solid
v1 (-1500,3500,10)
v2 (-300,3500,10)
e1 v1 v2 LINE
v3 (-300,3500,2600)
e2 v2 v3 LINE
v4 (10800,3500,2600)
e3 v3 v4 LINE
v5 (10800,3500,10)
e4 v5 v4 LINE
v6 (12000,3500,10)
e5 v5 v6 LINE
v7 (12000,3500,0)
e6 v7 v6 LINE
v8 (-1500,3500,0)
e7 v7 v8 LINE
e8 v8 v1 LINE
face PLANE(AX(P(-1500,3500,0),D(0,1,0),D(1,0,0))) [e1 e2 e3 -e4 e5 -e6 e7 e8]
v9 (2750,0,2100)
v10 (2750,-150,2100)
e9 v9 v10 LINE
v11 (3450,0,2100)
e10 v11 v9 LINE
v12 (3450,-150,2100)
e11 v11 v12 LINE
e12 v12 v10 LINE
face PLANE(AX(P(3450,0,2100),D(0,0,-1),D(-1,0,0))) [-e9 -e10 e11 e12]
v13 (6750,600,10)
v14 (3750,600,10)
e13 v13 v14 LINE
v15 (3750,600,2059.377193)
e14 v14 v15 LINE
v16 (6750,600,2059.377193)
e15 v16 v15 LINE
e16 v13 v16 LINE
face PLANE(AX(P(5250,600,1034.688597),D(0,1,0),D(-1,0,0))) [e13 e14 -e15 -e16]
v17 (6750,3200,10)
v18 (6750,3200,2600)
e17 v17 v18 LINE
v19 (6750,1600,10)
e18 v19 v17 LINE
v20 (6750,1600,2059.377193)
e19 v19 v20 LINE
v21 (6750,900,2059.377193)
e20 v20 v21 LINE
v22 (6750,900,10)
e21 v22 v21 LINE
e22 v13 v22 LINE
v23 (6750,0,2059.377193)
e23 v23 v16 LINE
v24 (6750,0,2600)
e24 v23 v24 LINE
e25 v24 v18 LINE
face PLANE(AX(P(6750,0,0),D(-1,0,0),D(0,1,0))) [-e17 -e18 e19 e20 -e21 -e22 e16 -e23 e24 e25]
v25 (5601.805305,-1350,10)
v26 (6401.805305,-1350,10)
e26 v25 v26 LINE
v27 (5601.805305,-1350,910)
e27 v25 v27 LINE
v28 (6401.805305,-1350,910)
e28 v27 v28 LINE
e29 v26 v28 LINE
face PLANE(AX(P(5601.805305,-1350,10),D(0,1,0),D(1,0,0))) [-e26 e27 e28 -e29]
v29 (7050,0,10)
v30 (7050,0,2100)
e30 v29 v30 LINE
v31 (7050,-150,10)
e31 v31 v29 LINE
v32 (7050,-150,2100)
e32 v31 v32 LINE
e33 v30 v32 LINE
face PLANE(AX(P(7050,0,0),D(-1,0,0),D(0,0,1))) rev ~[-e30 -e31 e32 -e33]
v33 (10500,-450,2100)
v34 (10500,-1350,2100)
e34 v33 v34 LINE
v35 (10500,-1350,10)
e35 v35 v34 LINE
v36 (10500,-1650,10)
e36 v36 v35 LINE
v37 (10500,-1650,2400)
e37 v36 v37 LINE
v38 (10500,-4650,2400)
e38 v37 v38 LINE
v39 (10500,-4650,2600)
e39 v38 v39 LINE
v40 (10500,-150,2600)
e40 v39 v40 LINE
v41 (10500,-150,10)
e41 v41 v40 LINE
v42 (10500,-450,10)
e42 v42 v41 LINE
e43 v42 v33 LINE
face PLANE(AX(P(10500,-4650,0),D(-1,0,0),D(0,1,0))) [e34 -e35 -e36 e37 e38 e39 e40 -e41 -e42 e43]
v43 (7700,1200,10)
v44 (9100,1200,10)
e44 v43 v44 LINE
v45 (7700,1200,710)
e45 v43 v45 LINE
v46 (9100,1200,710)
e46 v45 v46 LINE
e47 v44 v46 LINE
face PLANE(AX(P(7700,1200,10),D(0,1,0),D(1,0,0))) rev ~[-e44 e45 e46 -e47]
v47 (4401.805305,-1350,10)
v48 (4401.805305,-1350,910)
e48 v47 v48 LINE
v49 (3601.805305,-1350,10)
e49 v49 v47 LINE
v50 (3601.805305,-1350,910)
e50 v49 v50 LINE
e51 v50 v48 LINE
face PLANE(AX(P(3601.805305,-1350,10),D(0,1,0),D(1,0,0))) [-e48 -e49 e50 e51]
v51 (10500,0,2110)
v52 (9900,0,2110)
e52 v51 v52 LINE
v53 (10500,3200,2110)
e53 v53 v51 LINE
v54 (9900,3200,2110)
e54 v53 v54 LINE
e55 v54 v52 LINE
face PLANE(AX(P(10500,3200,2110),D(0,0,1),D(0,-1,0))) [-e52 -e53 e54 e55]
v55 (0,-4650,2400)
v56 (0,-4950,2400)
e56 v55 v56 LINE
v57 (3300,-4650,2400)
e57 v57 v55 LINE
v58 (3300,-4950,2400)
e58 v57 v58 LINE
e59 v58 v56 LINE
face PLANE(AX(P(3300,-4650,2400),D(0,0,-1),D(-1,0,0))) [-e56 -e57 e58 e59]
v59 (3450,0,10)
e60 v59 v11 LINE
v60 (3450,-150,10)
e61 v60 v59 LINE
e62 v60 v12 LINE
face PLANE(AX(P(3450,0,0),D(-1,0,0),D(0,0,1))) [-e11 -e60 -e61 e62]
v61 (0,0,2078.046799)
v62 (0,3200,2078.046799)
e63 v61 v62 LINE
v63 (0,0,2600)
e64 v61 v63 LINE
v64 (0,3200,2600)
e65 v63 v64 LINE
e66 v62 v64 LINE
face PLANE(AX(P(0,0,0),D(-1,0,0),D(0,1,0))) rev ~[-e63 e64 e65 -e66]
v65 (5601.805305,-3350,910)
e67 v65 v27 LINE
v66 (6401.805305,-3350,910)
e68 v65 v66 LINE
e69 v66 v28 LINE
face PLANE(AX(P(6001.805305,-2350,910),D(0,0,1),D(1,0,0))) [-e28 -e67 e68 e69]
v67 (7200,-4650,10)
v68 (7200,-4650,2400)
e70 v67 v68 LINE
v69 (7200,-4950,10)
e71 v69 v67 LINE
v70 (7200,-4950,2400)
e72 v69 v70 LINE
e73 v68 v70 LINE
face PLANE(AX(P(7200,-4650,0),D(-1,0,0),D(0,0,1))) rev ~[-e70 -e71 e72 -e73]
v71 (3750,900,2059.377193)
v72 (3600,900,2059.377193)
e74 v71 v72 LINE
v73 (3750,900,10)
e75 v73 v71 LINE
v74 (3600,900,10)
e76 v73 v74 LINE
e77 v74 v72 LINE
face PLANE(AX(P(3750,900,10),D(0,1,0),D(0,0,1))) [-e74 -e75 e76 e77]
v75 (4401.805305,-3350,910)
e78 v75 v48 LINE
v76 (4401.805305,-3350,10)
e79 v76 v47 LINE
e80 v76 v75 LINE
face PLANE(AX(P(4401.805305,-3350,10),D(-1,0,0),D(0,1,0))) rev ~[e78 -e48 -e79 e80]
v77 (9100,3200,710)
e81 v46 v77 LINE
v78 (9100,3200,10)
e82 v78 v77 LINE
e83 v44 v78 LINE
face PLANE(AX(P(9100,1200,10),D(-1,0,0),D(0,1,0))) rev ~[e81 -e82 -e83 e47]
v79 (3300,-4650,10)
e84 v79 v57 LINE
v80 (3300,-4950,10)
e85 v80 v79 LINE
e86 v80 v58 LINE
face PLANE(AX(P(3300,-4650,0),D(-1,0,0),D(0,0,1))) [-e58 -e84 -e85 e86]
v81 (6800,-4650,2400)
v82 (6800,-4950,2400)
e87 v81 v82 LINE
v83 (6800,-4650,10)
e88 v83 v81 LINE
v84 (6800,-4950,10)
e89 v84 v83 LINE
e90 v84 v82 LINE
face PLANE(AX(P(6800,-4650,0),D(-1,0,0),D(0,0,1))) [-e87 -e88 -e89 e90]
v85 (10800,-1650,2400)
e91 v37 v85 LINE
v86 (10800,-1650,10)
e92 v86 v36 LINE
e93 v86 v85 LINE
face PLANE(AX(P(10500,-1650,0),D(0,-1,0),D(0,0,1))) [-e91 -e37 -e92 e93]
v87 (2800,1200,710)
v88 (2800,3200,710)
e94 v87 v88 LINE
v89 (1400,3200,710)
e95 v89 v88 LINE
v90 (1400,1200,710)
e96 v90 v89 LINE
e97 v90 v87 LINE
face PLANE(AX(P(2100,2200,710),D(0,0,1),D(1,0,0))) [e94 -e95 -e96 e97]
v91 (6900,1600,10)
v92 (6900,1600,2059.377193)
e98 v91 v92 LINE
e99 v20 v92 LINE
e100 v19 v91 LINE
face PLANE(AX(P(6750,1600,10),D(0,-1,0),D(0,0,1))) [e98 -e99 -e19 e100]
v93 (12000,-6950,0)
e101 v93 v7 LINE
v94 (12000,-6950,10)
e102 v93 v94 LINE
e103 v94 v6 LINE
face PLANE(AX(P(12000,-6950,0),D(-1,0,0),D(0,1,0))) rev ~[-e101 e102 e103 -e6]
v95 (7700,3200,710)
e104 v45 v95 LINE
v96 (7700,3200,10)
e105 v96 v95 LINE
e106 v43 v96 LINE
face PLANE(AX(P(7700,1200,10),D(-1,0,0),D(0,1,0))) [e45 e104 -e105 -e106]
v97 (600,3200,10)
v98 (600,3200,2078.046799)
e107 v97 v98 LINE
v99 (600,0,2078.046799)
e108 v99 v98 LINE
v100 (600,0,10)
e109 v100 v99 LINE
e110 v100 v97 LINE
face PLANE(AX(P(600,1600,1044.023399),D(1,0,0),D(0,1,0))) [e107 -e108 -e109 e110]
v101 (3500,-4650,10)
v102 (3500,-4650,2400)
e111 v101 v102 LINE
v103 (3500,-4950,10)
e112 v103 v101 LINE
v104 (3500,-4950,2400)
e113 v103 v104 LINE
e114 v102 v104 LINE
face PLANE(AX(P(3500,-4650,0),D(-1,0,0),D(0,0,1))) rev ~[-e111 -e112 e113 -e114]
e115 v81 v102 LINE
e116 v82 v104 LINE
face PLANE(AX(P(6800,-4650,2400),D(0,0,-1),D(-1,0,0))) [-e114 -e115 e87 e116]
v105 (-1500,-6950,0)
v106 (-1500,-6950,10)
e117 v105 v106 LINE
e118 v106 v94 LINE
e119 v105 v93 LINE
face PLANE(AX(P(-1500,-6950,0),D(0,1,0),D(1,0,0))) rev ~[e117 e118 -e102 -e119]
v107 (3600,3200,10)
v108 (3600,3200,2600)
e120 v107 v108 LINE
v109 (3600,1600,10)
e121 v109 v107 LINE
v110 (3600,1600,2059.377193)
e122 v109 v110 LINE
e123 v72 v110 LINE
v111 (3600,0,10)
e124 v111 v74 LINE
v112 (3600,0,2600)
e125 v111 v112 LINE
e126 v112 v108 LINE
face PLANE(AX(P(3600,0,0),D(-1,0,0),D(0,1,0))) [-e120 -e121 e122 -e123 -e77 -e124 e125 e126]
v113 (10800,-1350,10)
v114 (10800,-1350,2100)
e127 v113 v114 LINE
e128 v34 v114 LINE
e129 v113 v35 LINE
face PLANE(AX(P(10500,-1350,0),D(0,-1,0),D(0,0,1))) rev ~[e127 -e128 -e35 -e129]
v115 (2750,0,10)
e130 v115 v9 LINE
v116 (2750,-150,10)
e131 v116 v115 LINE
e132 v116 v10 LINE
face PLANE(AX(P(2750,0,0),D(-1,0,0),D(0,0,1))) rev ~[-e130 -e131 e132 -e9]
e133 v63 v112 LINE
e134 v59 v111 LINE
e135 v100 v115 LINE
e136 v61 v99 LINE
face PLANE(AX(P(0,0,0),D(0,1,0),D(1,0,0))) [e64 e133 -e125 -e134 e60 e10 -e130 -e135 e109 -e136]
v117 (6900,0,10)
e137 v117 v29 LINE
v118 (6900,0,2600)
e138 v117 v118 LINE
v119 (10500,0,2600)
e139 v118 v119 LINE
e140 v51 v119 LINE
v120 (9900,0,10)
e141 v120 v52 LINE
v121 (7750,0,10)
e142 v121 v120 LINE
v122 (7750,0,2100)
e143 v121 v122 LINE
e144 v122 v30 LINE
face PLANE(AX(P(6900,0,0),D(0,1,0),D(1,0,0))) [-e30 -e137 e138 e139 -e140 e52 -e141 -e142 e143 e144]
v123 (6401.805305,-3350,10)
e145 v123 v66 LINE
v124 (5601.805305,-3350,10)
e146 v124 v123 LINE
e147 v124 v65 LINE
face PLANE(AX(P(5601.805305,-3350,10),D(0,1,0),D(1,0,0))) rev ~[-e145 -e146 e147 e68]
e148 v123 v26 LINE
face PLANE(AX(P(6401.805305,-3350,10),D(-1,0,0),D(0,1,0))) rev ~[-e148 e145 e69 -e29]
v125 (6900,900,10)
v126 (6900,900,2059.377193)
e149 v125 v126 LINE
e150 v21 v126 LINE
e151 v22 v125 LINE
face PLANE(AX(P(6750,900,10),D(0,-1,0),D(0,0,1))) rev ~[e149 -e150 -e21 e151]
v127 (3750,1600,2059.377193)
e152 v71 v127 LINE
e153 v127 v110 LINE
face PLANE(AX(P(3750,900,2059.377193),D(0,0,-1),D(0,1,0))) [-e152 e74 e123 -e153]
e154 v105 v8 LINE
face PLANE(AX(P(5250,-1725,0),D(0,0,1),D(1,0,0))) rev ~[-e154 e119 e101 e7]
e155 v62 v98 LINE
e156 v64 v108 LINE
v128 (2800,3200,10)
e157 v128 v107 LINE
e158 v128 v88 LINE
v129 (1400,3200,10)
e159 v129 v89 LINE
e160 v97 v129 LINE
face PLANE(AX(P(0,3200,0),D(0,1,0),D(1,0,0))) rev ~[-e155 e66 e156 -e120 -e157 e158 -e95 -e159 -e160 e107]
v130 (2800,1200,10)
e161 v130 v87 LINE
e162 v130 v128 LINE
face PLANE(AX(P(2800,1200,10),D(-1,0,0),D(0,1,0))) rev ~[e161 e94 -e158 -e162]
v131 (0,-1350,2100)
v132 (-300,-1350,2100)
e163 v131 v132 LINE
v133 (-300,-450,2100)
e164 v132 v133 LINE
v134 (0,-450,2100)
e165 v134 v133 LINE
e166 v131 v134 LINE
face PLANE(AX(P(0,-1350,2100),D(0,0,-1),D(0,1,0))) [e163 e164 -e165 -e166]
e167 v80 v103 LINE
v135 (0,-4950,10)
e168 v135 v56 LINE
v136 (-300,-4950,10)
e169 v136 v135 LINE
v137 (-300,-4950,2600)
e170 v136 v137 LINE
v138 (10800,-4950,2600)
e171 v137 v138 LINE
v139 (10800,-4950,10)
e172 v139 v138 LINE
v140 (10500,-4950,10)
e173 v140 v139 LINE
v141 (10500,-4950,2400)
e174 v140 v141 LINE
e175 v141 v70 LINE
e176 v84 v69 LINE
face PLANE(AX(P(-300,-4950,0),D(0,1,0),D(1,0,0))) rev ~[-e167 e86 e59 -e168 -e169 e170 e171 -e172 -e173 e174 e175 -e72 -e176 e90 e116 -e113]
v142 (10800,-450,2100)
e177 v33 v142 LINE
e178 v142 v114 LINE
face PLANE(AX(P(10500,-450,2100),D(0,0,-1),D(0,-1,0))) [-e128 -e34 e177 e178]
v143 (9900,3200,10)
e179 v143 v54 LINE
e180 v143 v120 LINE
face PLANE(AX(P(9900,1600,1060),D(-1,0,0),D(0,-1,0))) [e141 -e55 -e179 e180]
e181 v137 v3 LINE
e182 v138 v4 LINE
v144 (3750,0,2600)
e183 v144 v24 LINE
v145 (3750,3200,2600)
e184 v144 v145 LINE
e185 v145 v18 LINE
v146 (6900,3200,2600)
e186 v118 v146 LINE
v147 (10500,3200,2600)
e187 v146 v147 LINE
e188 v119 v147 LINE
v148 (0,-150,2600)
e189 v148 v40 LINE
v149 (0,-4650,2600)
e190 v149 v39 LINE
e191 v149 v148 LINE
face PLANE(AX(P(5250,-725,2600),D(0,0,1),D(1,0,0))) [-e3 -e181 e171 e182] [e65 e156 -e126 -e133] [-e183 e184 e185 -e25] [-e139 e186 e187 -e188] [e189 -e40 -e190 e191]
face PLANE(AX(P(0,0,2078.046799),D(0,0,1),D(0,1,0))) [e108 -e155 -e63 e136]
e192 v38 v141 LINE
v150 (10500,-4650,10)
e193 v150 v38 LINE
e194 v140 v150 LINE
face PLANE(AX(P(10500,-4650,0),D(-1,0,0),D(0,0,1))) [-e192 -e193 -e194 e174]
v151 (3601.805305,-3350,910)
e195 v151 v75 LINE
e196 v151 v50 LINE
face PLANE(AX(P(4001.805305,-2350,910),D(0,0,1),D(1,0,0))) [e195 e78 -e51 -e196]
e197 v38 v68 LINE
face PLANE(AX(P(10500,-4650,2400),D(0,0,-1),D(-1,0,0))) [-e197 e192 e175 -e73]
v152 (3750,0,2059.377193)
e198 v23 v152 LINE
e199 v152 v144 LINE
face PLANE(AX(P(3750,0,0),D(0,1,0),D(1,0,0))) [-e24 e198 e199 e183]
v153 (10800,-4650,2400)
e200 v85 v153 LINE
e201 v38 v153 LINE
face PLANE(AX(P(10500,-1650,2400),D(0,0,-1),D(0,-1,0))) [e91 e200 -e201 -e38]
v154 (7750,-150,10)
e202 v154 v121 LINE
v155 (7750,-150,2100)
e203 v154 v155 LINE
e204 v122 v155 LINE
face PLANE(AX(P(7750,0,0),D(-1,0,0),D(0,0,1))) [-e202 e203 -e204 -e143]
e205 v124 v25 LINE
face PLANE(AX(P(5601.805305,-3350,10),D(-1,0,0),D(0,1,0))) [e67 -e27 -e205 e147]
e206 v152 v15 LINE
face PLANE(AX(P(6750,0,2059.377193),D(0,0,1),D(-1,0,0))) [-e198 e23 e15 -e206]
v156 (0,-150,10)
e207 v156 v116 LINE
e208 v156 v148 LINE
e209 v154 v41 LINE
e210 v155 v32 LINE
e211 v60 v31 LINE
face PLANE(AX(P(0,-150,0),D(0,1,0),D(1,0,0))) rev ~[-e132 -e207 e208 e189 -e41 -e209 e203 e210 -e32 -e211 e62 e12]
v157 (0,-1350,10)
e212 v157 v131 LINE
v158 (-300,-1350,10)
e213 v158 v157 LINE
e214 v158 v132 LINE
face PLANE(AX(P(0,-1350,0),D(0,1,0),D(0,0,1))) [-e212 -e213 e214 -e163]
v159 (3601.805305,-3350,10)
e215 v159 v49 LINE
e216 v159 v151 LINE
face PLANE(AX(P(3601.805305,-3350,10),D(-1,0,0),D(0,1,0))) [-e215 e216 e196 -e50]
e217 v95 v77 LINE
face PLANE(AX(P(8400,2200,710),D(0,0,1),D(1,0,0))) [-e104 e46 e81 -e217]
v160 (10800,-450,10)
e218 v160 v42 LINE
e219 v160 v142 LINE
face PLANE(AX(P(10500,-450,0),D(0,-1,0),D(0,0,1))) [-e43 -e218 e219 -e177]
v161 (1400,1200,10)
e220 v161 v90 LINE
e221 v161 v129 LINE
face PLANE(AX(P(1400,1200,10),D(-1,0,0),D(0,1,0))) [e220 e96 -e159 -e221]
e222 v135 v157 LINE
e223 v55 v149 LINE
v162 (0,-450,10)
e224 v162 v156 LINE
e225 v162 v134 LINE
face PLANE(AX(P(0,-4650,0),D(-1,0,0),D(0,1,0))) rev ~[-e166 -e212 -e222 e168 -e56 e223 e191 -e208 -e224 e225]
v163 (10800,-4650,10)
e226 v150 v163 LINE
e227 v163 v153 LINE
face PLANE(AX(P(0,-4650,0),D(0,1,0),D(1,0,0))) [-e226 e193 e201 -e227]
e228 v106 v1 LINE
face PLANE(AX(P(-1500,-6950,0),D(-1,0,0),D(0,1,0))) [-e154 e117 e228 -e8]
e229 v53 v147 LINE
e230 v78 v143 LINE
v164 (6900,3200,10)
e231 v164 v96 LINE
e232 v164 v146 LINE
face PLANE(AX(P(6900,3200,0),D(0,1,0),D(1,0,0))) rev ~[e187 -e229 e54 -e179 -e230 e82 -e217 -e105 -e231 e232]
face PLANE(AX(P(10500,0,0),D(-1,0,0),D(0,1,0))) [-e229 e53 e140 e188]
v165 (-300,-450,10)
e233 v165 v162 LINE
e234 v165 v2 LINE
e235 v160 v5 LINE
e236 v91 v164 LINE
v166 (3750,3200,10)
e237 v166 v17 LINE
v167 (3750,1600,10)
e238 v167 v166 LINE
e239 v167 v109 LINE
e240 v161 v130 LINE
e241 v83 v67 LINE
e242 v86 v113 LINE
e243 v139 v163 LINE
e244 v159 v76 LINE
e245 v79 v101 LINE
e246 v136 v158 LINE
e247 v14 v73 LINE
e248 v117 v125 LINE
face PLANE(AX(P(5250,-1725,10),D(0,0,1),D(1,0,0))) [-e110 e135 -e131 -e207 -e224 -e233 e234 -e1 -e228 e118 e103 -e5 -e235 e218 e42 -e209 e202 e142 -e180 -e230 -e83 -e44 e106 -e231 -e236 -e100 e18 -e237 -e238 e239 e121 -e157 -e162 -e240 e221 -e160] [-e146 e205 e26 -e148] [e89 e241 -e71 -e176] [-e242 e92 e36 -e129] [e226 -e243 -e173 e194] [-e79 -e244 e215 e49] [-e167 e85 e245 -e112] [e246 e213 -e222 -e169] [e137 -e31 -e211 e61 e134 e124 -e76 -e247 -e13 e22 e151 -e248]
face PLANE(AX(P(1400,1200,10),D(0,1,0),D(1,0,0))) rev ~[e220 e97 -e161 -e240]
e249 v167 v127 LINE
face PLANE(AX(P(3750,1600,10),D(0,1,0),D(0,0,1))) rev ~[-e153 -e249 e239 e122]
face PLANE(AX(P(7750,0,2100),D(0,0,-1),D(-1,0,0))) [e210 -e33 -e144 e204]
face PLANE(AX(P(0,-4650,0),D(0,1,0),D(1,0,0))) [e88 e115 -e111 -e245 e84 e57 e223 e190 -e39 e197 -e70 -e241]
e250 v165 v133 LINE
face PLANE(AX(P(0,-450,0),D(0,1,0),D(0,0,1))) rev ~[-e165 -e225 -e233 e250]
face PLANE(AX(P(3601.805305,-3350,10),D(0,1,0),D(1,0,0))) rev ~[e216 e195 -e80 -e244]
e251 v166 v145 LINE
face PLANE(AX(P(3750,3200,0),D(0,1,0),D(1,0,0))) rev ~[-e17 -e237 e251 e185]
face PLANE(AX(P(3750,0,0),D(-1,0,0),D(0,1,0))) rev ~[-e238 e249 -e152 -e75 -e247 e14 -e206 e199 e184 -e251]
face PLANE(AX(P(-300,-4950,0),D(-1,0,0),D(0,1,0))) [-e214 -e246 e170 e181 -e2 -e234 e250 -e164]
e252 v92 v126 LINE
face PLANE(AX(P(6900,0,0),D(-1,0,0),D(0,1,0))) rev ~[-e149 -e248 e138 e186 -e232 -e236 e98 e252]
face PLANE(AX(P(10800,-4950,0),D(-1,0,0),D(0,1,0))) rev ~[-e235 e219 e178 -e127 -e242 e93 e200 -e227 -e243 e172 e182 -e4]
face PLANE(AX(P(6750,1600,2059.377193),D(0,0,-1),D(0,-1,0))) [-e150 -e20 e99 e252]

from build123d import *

# Parameters (mm, degrees)
F0_W      = 11100
F0_H      = 8450
F0_W_2    = 10500
F0_H_2    = 4500
F0_W_3    = 3600
F0_H_3    = 3200
F0_W_4    = 3000
F1_DEPTH  = 2600
F2_W      = 700
F2_H      = 2100
F3_DEPTH  = 150
F4_W      = 900
F4_H      = 2100
F5_DEPTH  = 300
F6_W      = 900
F6_H      = 2100
F7_DEPTH  = 300
F8_W      = 3000
F8_H      = 2400
F10_DEPTH = 300
F11_W     = 3300
F11_H     = 2400
F12_DEPTH = 300
F13_W     = 13500
F13_H     = 10450
F14_DEPTH = 10
F15_W     = 3200
F15_H     = 2068.0467987061
F16_DEPTH = 600
F17_W     = 3200
F17_H     = 2100
F18_DEPTH = 600
F19_W     = 3000
F19_H     = 2049.3771934509
F20_DEPTH = 600
F21_W     = 1400
F21_H     = 2000
F22_DEPTH = 700
F23_W     = 1400
F23_H     = 2000
F24_DEPTH = 700
F25_W     = 700
F25_H     = 2049.3771934509
F26_DEPTH = 150
F27_W     = 700
F27_H     = 2049.3771934509
F28_DEPTH = 150
F29_W     = 800
F29_H     = 2000
F30_DEPTH = 900


# Not quite as in the source:
# - a feature names something its author has since deleted; it is built from what else it names


with BuildPart() as f1:
    # F0 (on Top) → F1 (new body)
    with BuildSketch(Plane.XY):
        with Locations((5250, -725)):
            Rectangle(F0_W, F0_H)
        with Locations((5250, -2400)):
            Rectangle(F0_W_2, F0_H_2, mode=Mode.SUBTRACT)
        with Locations((1800, 1600)):
            Rectangle(F0_W_3, F0_H_3, mode=Mode.SUBTRACT)
        with Locations((5250, 1600)):
            Rectangle(F0_W_4, F0_H_3, mode=Mode.SUBTRACT)
        with Locations((8700, 1600)):
            Rectangle(F0_W_3, F0_H_3, mode=Mode.SUBTRACT)
    extrude(amount=F1_DEPTH)

    # F2 (on face) → F3 (cut, through all)
    with BuildSketch(Plane(origin=(0, 0, 0), x_dir=(-1, 0, 0), z_dir=(0, 1, 0))):
        with Locations((-7400, 1050)):
            Rectangle(F2_W, F2_H)
        with Locations((-3100, 1050)):
            Rectangle(F2_W, F2_H)
    extrude(amount=-F3_DEPTH, mode=Mode.SUBTRACT)

    # F4 (on face) → F5 (cut, through all)
    with BuildSketch(Plane(origin=(10500, 0, 0), x_dir=(0, -1, 0), z_dir=(-1, 0, 0))):
        with Locations((900, 1050)):
            Rectangle(F4_W, F4_H)
    extrude(amount=-F5_DEPTH, mode=Mode.SUBTRACT)

    # F6 (on face) → F7 (cut, through all)
    with BuildSketch(Plane.YZ):
        with Locations((-900, 1050)):
            Rectangle(F6_W, F6_H)
    extrude(amount=-F7_DEPTH, mode=Mode.SUBTRACT)

    # F8 (on face) → F10 (cut, through all)
    with BuildSketch(Plane(origin=(10500, 0, 0), x_dir=(0, -1, 0), z_dir=(-1, 0, 0))):
        with Locations((3150, 1200)):
            Rectangle(F8_W, F8_H)
    extrude(amount=-F10_DEPTH, mode=Mode.SUBTRACT)

    # F11 (on face) → F12 (cut, through all)
    with BuildSketch(Plane(origin=(0, -4650, 0), x_dir=(-1, 0, 0), z_dir=(0, 1, 0))):
        with Locations((-8850, 1200)):
            Rectangle(F11_W, F11_H)
        with Locations((-5150, 1200)):
            Rectangle(F11_W, F11_H)
        with Locations((-1650, 1200)):
            Rectangle(F11_W, F11_H)
    extrude(amount=-F12_DEPTH, mode=Mode.SUBTRACT)

    # F13 (on Top) → F14 (join)
    with BuildSketch(Plane.XY):
        with Locations((5250, -1725)):
            Rectangle(F13_W, F13_H)
    extrude(amount=F14_DEPTH)

    # F15 (on face) → F16 (join)
    with BuildSketch(Plane.YZ):
        with Locations((1600, 1044.023399353)):
            Rectangle(F15_W, F15_H)
    extrude(amount=F16_DEPTH)

    # F17 (on face) → F18 (join)
    with BuildSketch(Plane(origin=(10500, 0, 0), x_dir=(0, -1, 0), z_dir=(-1, 0, 0))):
        with Locations((-1600, 1060)):
            Rectangle(F17_W, F17_H)
    extrude(amount=F18_DEPTH)

    # F19 (on face) → F20 (join)
    with BuildSketch(Plane(origin=(0, 0, 0), x_dir=(-1, 0, 0), z_dir=(0, 1, 0))):
        with Locations((-5250, 1034.6885967255)):
            Rectangle(F19_W, F19_H)
    extrude(amount=F20_DEPTH)

    # F21 (on face) → F22 (join)
    with BuildSketch(Plane.XY.offset(10)):
        with Locations((2100, 2200)):
            Rectangle(F21_W, F21_H)
    extrude(amount=F22_DEPTH)

    # F23 (on face) → F24 (join)
    with BuildSketch(Plane.XY.offset(10)):
        with Locations((8400, 2200)):
            Rectangle(F23_W, F23_H)
    extrude(amount=F24_DEPTH)

    # F25 (on face) → F26 (cut, through all)
    with BuildSketch(Plane(origin=(6750, 0, 0), x_dir=(0, -1, 0), z_dir=(-1, 0, 0))):
        with Locations((-1250, 1034.6885967255)):
            Rectangle(F25_W, F25_H)
    extrude(amount=-F26_DEPTH, mode=Mode.SUBTRACT)

    # F27 (on face) → F28 (cut, through all)
    with BuildSketch(Plane.YZ.offset(3750)):
        with Locations((1250, 1034.6885967255)):
            Rectangle(F27_W, F27_H)
    extrude(amount=-F28_DEPTH, mode=Mode.SUBTRACT)

    # F29 (on face) → F30 (join)
    with BuildSketch(Plane.XY.offset(10)):
        with Locations((4001.805305481, -2350)):
            Rectangle(F29_W, F29_H)
        with Locations((6001.805305481, -2350)):
            Rectangle(F29_W, F29_H)
    extrude(amount=F30_DEPTH)


solid = f1.part
